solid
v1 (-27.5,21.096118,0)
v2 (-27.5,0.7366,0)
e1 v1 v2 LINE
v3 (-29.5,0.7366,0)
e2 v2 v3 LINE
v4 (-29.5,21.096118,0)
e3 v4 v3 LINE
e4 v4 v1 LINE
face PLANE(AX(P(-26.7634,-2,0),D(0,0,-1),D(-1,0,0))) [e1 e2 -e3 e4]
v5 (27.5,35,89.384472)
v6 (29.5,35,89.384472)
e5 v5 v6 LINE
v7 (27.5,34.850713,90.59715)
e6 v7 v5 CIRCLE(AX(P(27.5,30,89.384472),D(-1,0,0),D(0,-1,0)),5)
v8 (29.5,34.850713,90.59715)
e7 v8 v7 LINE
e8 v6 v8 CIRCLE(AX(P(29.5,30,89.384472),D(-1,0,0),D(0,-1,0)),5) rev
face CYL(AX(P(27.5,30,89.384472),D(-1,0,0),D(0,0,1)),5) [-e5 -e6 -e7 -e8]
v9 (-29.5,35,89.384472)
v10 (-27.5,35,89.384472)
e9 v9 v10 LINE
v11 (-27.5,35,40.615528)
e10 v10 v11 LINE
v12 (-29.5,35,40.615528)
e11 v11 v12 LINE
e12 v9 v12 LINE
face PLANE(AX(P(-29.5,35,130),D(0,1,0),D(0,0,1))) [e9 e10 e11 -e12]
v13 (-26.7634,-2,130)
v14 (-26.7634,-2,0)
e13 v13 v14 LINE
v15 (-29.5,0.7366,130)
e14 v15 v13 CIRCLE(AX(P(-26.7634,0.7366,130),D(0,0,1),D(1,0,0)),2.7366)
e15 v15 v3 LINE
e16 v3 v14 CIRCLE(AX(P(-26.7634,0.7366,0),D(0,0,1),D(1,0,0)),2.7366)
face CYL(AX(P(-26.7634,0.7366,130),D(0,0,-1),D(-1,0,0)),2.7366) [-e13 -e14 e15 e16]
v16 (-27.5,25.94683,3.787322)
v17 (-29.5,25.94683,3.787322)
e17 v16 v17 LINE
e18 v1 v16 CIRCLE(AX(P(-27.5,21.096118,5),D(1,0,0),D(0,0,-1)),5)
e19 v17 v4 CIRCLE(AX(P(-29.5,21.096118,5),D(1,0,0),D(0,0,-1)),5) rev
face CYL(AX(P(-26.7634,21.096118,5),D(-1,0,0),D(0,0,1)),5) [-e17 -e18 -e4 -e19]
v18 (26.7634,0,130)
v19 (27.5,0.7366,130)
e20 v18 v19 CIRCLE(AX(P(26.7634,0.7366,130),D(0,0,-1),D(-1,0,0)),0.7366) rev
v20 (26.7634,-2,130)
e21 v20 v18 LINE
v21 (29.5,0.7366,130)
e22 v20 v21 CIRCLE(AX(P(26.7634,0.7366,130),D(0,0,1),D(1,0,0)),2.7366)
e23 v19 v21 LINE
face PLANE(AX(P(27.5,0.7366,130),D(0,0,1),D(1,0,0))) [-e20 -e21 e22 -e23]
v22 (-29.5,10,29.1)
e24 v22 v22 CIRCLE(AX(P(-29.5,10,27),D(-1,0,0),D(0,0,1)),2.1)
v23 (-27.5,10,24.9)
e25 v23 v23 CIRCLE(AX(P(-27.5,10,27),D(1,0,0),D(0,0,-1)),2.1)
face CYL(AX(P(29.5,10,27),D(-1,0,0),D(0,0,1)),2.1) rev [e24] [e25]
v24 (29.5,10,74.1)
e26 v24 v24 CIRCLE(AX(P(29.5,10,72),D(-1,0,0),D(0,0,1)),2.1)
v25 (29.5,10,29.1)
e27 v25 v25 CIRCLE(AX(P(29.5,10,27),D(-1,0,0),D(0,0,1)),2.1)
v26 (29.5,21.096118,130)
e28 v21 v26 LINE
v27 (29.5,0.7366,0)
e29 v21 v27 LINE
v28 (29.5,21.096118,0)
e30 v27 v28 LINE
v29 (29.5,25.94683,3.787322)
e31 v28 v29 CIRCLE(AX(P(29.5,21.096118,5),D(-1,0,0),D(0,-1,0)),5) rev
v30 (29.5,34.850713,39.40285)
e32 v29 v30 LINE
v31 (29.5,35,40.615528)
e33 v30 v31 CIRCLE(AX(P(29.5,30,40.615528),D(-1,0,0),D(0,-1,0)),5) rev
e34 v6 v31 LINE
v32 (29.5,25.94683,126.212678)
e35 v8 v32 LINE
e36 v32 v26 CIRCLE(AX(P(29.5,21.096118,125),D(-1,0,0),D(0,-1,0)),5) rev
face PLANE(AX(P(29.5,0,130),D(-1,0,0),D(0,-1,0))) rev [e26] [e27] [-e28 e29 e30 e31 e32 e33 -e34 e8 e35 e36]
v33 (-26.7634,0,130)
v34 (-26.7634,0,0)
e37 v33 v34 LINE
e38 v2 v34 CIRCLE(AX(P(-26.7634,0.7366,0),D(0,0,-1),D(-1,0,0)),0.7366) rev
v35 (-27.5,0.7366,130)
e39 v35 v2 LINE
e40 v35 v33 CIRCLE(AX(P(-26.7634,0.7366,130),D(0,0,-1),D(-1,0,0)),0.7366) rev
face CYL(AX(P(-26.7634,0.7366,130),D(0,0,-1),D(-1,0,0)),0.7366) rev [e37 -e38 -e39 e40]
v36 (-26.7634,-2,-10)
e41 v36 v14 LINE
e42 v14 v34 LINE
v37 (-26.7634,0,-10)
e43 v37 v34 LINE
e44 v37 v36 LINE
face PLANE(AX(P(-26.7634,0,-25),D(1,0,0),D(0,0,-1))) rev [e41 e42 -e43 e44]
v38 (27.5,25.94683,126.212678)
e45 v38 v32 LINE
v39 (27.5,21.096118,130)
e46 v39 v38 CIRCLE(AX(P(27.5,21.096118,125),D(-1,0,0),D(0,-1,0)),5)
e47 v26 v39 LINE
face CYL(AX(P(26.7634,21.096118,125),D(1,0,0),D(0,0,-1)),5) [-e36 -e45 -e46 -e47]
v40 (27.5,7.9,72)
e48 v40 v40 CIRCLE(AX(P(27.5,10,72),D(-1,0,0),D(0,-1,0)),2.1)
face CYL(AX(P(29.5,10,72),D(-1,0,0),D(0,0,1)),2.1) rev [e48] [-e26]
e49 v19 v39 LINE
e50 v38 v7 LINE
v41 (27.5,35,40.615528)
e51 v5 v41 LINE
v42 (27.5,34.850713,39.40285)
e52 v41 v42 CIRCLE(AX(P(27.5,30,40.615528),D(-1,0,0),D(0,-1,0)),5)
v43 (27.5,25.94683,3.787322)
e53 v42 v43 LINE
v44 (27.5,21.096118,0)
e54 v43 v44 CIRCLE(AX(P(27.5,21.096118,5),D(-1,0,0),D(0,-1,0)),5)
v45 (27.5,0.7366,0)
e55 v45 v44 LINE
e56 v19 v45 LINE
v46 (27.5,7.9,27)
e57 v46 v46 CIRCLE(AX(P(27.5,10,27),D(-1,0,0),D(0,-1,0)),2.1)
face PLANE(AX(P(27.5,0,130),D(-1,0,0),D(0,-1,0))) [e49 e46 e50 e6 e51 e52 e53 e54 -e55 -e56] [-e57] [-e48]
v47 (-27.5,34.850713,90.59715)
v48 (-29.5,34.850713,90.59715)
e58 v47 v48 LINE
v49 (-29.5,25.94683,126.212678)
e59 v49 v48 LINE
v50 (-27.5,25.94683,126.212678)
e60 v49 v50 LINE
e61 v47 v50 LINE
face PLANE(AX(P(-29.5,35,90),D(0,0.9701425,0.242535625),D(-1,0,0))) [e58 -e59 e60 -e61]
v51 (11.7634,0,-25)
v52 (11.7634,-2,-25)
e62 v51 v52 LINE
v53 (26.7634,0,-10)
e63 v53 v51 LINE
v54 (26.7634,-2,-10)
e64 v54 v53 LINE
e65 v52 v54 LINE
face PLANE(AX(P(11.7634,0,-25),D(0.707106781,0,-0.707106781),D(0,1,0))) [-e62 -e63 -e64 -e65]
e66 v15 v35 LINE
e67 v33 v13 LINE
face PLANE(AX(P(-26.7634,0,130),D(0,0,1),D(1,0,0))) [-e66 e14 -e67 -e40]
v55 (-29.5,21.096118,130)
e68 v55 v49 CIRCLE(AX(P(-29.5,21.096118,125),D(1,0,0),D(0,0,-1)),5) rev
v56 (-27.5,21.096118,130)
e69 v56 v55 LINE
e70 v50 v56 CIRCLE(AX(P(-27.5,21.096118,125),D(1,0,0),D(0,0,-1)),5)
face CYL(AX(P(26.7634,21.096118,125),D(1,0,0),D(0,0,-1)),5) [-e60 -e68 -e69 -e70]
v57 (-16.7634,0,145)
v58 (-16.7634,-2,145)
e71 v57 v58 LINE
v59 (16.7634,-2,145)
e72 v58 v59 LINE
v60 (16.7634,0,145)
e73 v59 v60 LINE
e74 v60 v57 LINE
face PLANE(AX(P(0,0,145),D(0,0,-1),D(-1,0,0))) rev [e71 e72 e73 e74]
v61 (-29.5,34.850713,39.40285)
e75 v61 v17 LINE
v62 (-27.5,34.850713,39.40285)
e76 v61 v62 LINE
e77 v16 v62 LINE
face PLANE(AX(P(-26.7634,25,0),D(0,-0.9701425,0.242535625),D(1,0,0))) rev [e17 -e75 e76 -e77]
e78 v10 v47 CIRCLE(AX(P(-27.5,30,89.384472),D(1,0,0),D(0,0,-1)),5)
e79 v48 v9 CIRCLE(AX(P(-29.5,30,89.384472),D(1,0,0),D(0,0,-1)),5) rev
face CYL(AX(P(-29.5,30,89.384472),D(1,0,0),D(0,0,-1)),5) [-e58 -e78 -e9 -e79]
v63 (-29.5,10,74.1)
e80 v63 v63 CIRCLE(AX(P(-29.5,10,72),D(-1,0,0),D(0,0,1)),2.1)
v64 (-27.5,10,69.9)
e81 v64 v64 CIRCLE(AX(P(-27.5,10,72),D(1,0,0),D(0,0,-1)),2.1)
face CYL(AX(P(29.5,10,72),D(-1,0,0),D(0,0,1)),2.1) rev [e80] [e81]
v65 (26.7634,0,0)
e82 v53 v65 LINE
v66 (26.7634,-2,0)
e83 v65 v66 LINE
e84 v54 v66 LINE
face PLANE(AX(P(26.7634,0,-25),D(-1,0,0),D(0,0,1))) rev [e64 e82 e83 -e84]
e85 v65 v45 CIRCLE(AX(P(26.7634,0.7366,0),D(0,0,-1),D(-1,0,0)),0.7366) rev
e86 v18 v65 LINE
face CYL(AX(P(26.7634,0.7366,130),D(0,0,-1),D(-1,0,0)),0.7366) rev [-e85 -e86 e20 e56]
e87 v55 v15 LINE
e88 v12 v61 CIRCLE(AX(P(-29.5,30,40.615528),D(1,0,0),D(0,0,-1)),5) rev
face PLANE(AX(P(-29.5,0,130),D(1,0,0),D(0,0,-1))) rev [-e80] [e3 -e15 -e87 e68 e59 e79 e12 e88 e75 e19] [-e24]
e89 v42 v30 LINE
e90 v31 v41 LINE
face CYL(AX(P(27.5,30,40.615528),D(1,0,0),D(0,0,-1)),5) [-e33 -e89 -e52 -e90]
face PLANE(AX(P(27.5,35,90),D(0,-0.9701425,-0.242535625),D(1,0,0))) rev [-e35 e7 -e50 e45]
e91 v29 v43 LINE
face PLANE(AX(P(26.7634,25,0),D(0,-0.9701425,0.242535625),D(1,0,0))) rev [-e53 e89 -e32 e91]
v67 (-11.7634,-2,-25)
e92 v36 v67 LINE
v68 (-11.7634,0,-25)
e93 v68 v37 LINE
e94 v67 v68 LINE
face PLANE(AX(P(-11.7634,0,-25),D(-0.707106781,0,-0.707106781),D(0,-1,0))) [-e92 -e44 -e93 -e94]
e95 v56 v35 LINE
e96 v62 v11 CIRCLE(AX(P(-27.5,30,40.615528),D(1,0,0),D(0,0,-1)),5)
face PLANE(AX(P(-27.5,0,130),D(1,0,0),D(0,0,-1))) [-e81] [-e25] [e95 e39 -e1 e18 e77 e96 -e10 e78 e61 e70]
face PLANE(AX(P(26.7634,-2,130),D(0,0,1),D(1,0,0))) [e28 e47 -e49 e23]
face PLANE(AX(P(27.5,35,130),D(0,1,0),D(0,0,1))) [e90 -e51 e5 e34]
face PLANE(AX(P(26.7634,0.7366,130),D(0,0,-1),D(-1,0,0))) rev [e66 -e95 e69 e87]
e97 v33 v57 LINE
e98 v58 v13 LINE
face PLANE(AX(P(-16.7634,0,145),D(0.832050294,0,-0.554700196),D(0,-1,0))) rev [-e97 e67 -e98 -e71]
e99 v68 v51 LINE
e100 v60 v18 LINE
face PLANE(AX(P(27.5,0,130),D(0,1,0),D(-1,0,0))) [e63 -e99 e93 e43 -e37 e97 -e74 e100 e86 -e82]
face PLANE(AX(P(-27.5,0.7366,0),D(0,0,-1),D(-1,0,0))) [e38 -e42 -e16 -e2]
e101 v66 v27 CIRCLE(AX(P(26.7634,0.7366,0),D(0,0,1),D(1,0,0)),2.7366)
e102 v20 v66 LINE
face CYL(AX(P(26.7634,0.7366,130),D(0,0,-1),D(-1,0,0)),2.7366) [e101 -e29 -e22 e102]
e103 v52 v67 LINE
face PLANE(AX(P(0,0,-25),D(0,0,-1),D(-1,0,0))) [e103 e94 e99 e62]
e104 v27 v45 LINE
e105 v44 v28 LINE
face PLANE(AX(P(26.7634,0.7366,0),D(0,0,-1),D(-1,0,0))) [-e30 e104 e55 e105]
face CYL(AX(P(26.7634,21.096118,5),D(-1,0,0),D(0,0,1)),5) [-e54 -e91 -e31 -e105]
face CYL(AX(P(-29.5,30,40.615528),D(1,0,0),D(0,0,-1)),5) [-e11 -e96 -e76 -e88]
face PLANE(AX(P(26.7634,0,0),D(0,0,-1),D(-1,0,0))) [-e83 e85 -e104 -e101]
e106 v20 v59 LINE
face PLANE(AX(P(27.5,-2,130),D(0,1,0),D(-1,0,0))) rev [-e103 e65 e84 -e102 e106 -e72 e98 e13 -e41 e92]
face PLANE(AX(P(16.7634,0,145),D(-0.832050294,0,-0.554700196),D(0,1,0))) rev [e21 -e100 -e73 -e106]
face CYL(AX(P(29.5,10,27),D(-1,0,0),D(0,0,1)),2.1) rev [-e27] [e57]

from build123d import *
from OCP.BRepFilletAPI import BRepFilletAPI_MakeChamfer

# Parameters (mm, degrees)
SM_BASE_FLANGE_1_DEPTH = 130
SKETCH_6_R             = 2.1
CUT_EXTRUDE_1_DEPTH    = 147.989795564
PATTERN_LINEAR_1_COUNT = 2
PATTERN_LINEAR_1_PITCH = 45
CHAMFER_1_SIZE         = 10
CHAMFER_1_SIZE2        = 40
CHAMFER_2_SIZE         = 40
CHAMFER_2_SIZE2        = 10
FILLET_1_R             = 5
SKETCH_9_W             = 53.5268
SKETCH_9_H             = 2
EXTRUDE_1_DEPTH        = 15
CHAMFER_5_SIZE         = 10
CHAMFER_5_SIZE_2       = 15
SKETCH_11_W            = 53.5268
SKETCH_11_H            = 2
EXTRUDE_2_DEPTH        = 25
CHAMFER_6_SIZE         = 15


# Read off the part's stored shape, not the designer's step: 基材-凸緣1
with BuildPart() as part:
    # 基材-凸緣1 outline → 基材-凸緣1 (new body)
    with BuildSketch(Plane.XY):
        with BuildLine():
            Line((29.5, 0.7366), (29.5, 35))
            Line((29.5, 35), (27.5, 35))
            Line((27.5, 35), (27.5, 0.7366))
            ThreePointArc((27.5, 0.7366), (27.284254855, 0.215745145), (26.7634, 0))
            Line((26.7634, 0), (-26.7634, 0))
            ThreePointArc((-26.7634, 0), (-27.284254855, 0.215745145), (-27.5, 0.7366))
            Line((-27.5, 0.7366), (-27.5, 35))
            Line((-27.5, 35), (-29.5, 35))
            Line((-29.5, 35), (-29.5, 0.7366))
            ThreePointArc((-29.5, 0.7366), (-28.698468417, -1.198468417), (-26.7634, -2))
            Line((-26.7634, -2), (26.7634, -2))
            ThreePointArc((26.7634, -2), (28.698468417, -1.198468417), (29.5, 0.7366))
        make_face()
    extrude(amount=SM_BASE_FLANGE_1_DEPTH)

    # 草圖6 → 除料-伸長1 (cut, through all)
    with BuildSketch(Plane.ZY.offset(29.5)):
        with Locations((72, 10)):
            Circle(SKETCH_6_R)
    cut_extrude_1 = extrude(amount=-CUT_EXTRUDE_1_DEPTH, mode=Mode.SUBTRACT)

    # 直線複製排列1: 除料-伸長1 ×2
    with Locations(*[(0, 0, -i * PATTERN_LINEAR_1_PITCH) for i in range(1, PATTERN_LINEAR_1_COUNT)]):
        add(cut_extrude_1, mode=Mode.SUBTRACT)

    # 導角1
    chamfer_1_edges = [part.edges().sort_by_distance(p)[0] for p in [
        (-28.5, 35, 130),
        (28.5, 35, 130),
    ]]
    chamfer_1_side = [part.faces().sort_by_distance(p)[0] for p in [
        (0, -1.303580586, 130),
    ]]
    chamfer(chamfer_1_edges, length=CHAMFER_1_SIZE, length2=CHAMFER_1_SIZE2, reference=chamfer_1_side[0])

    # 導角2: one chamfer whose edges measure the first distance from different faces: ONE call of the kernel's chamfer builder (chamfer() names one face for all edges)
    chamfer_2_edges_1 = [part.edges().sort_by_distance(p)[0] for p in [
        (-28.5, 35, 0),
    ]]
    chamfer_2_side_1 = [part.faces().sort_by_distance(p)[0] for p in [
        (-28.5, 35, 45),
    ]]
    chamfer_2_edges_2 = [part.edges().sort_by_distance(p)[0] for p in [
        (28.5, 35, 0),
    ]]
    chamfer_2_side_2 = [part.faces().sort_by_distance(p)[0] for p in [
        (28.5, 35, 45),
    ]]
    chamfer_2 = BRepFilletAPI_MakeChamfer(part.part.solid().wrapped)
    for e in chamfer_2_edges_1:
        chamfer_2.Add(CHAMFER_2_SIZE, CHAMFER_2_SIZE2, e.wrapped, chamfer_2_side_1[0].wrapped)  # the first distance lies on this face
    for e in chamfer_2_edges_2:
        chamfer_2.Add(CHAMFER_2_SIZE, CHAMFER_2_SIZE2, e.wrapped, chamfer_2_side_2[0].wrapped)  # the first distance lies on this face
    add(Compound.cast(chamfer_2.Shape()), mode=Mode.REPLACE)

    # 圓角1
    fillet_1_edges = [part.edges().sort_by_distance(p)[0] for p in [
        (28.5, 35, 90),
        (28.5, 25, 130),
        (-28.5, 35, 90),
        (-28.5, 25, 130),
        (-28.5, 25, 0),
        (-28.5, 35, 40),
        (28.5, 25, 0),
        (28.5, 35, 40),
    ]]
    fillet(fillet_1_edges, radius=FILLET_1_R)

    # 草圖9 → 填料-伸長1 (add)
    with BuildSketch(Plane.XY.offset(130)):
        with Locations((0, -1)):
            Rectangle(SKETCH_9_W, SKETCH_9_H)
    extrude(amount=EXTRUDE_1_DEPTH)

    # 導角5
    chamfer_5_edges_1 = [part.edges().sort_by_distance(p)[0] for p in [
        (-26.7634, -1, 145),
    ]]
    chamfer_5_side_1 = [part.faces().sort_by_distance(p)[0] for p in [
        (-26.5634, -1, 145),
    ]]
    chamfer_5_edges_2 = [part.edges().sort_by_distance(p)[0] for p in [
        (26.7634, -1, 145),
    ]]
    chamfer_5_side_2 = [part.faces().sort_by_distance(p)[0] for p in [
        (26.7634, -1, 144.8),
    ]]
    chamfer_5 = BRepFilletAPI_MakeChamfer(part.part.solid().wrapped)
    for e in chamfer_5_edges_1:
        chamfer_5.Add(CHAMFER_5_SIZE - 0.0001, CHAMFER_5_SIZE_2 - 0.0001, e.wrapped, chamfer_5_side_1[0].wrapped)
    for e in chamfer_5_edges_2:
        chamfer_5.Add(CHAMFER_5_SIZE_2 - 0.0001, CHAMFER_5_SIZE - 0.0001, e.wrapped, chamfer_5_side_2[0].wrapped)
    add(Compound.cast(chamfer_5.Shape()), mode=Mode.REPLACE)  # a hair under: the kernel refuses the full size

    # 草圖11 → 填料-伸長2 (add)
    with BuildSketch(Plane(origin=(0, 0, 0), x_dir=(-1, 0, 0), z_dir=(0, 0, -1))):
        with Locations((0, -1)):
            Rectangle(SKETCH_11_W, SKETCH_11_H)
    extrude(amount=EXTRUDE_2_DEPTH)

    # 導角6
    chamfer_6_edges = [part.edges().sort_by_distance(p)[0] for p in [
        (26.7634, -1, -25),
        (-26.7634, -1, -25),
    ]]
    chamfer(chamfer_6_edges, length=CHAMFER_6_SIZE)


solid = part.part
